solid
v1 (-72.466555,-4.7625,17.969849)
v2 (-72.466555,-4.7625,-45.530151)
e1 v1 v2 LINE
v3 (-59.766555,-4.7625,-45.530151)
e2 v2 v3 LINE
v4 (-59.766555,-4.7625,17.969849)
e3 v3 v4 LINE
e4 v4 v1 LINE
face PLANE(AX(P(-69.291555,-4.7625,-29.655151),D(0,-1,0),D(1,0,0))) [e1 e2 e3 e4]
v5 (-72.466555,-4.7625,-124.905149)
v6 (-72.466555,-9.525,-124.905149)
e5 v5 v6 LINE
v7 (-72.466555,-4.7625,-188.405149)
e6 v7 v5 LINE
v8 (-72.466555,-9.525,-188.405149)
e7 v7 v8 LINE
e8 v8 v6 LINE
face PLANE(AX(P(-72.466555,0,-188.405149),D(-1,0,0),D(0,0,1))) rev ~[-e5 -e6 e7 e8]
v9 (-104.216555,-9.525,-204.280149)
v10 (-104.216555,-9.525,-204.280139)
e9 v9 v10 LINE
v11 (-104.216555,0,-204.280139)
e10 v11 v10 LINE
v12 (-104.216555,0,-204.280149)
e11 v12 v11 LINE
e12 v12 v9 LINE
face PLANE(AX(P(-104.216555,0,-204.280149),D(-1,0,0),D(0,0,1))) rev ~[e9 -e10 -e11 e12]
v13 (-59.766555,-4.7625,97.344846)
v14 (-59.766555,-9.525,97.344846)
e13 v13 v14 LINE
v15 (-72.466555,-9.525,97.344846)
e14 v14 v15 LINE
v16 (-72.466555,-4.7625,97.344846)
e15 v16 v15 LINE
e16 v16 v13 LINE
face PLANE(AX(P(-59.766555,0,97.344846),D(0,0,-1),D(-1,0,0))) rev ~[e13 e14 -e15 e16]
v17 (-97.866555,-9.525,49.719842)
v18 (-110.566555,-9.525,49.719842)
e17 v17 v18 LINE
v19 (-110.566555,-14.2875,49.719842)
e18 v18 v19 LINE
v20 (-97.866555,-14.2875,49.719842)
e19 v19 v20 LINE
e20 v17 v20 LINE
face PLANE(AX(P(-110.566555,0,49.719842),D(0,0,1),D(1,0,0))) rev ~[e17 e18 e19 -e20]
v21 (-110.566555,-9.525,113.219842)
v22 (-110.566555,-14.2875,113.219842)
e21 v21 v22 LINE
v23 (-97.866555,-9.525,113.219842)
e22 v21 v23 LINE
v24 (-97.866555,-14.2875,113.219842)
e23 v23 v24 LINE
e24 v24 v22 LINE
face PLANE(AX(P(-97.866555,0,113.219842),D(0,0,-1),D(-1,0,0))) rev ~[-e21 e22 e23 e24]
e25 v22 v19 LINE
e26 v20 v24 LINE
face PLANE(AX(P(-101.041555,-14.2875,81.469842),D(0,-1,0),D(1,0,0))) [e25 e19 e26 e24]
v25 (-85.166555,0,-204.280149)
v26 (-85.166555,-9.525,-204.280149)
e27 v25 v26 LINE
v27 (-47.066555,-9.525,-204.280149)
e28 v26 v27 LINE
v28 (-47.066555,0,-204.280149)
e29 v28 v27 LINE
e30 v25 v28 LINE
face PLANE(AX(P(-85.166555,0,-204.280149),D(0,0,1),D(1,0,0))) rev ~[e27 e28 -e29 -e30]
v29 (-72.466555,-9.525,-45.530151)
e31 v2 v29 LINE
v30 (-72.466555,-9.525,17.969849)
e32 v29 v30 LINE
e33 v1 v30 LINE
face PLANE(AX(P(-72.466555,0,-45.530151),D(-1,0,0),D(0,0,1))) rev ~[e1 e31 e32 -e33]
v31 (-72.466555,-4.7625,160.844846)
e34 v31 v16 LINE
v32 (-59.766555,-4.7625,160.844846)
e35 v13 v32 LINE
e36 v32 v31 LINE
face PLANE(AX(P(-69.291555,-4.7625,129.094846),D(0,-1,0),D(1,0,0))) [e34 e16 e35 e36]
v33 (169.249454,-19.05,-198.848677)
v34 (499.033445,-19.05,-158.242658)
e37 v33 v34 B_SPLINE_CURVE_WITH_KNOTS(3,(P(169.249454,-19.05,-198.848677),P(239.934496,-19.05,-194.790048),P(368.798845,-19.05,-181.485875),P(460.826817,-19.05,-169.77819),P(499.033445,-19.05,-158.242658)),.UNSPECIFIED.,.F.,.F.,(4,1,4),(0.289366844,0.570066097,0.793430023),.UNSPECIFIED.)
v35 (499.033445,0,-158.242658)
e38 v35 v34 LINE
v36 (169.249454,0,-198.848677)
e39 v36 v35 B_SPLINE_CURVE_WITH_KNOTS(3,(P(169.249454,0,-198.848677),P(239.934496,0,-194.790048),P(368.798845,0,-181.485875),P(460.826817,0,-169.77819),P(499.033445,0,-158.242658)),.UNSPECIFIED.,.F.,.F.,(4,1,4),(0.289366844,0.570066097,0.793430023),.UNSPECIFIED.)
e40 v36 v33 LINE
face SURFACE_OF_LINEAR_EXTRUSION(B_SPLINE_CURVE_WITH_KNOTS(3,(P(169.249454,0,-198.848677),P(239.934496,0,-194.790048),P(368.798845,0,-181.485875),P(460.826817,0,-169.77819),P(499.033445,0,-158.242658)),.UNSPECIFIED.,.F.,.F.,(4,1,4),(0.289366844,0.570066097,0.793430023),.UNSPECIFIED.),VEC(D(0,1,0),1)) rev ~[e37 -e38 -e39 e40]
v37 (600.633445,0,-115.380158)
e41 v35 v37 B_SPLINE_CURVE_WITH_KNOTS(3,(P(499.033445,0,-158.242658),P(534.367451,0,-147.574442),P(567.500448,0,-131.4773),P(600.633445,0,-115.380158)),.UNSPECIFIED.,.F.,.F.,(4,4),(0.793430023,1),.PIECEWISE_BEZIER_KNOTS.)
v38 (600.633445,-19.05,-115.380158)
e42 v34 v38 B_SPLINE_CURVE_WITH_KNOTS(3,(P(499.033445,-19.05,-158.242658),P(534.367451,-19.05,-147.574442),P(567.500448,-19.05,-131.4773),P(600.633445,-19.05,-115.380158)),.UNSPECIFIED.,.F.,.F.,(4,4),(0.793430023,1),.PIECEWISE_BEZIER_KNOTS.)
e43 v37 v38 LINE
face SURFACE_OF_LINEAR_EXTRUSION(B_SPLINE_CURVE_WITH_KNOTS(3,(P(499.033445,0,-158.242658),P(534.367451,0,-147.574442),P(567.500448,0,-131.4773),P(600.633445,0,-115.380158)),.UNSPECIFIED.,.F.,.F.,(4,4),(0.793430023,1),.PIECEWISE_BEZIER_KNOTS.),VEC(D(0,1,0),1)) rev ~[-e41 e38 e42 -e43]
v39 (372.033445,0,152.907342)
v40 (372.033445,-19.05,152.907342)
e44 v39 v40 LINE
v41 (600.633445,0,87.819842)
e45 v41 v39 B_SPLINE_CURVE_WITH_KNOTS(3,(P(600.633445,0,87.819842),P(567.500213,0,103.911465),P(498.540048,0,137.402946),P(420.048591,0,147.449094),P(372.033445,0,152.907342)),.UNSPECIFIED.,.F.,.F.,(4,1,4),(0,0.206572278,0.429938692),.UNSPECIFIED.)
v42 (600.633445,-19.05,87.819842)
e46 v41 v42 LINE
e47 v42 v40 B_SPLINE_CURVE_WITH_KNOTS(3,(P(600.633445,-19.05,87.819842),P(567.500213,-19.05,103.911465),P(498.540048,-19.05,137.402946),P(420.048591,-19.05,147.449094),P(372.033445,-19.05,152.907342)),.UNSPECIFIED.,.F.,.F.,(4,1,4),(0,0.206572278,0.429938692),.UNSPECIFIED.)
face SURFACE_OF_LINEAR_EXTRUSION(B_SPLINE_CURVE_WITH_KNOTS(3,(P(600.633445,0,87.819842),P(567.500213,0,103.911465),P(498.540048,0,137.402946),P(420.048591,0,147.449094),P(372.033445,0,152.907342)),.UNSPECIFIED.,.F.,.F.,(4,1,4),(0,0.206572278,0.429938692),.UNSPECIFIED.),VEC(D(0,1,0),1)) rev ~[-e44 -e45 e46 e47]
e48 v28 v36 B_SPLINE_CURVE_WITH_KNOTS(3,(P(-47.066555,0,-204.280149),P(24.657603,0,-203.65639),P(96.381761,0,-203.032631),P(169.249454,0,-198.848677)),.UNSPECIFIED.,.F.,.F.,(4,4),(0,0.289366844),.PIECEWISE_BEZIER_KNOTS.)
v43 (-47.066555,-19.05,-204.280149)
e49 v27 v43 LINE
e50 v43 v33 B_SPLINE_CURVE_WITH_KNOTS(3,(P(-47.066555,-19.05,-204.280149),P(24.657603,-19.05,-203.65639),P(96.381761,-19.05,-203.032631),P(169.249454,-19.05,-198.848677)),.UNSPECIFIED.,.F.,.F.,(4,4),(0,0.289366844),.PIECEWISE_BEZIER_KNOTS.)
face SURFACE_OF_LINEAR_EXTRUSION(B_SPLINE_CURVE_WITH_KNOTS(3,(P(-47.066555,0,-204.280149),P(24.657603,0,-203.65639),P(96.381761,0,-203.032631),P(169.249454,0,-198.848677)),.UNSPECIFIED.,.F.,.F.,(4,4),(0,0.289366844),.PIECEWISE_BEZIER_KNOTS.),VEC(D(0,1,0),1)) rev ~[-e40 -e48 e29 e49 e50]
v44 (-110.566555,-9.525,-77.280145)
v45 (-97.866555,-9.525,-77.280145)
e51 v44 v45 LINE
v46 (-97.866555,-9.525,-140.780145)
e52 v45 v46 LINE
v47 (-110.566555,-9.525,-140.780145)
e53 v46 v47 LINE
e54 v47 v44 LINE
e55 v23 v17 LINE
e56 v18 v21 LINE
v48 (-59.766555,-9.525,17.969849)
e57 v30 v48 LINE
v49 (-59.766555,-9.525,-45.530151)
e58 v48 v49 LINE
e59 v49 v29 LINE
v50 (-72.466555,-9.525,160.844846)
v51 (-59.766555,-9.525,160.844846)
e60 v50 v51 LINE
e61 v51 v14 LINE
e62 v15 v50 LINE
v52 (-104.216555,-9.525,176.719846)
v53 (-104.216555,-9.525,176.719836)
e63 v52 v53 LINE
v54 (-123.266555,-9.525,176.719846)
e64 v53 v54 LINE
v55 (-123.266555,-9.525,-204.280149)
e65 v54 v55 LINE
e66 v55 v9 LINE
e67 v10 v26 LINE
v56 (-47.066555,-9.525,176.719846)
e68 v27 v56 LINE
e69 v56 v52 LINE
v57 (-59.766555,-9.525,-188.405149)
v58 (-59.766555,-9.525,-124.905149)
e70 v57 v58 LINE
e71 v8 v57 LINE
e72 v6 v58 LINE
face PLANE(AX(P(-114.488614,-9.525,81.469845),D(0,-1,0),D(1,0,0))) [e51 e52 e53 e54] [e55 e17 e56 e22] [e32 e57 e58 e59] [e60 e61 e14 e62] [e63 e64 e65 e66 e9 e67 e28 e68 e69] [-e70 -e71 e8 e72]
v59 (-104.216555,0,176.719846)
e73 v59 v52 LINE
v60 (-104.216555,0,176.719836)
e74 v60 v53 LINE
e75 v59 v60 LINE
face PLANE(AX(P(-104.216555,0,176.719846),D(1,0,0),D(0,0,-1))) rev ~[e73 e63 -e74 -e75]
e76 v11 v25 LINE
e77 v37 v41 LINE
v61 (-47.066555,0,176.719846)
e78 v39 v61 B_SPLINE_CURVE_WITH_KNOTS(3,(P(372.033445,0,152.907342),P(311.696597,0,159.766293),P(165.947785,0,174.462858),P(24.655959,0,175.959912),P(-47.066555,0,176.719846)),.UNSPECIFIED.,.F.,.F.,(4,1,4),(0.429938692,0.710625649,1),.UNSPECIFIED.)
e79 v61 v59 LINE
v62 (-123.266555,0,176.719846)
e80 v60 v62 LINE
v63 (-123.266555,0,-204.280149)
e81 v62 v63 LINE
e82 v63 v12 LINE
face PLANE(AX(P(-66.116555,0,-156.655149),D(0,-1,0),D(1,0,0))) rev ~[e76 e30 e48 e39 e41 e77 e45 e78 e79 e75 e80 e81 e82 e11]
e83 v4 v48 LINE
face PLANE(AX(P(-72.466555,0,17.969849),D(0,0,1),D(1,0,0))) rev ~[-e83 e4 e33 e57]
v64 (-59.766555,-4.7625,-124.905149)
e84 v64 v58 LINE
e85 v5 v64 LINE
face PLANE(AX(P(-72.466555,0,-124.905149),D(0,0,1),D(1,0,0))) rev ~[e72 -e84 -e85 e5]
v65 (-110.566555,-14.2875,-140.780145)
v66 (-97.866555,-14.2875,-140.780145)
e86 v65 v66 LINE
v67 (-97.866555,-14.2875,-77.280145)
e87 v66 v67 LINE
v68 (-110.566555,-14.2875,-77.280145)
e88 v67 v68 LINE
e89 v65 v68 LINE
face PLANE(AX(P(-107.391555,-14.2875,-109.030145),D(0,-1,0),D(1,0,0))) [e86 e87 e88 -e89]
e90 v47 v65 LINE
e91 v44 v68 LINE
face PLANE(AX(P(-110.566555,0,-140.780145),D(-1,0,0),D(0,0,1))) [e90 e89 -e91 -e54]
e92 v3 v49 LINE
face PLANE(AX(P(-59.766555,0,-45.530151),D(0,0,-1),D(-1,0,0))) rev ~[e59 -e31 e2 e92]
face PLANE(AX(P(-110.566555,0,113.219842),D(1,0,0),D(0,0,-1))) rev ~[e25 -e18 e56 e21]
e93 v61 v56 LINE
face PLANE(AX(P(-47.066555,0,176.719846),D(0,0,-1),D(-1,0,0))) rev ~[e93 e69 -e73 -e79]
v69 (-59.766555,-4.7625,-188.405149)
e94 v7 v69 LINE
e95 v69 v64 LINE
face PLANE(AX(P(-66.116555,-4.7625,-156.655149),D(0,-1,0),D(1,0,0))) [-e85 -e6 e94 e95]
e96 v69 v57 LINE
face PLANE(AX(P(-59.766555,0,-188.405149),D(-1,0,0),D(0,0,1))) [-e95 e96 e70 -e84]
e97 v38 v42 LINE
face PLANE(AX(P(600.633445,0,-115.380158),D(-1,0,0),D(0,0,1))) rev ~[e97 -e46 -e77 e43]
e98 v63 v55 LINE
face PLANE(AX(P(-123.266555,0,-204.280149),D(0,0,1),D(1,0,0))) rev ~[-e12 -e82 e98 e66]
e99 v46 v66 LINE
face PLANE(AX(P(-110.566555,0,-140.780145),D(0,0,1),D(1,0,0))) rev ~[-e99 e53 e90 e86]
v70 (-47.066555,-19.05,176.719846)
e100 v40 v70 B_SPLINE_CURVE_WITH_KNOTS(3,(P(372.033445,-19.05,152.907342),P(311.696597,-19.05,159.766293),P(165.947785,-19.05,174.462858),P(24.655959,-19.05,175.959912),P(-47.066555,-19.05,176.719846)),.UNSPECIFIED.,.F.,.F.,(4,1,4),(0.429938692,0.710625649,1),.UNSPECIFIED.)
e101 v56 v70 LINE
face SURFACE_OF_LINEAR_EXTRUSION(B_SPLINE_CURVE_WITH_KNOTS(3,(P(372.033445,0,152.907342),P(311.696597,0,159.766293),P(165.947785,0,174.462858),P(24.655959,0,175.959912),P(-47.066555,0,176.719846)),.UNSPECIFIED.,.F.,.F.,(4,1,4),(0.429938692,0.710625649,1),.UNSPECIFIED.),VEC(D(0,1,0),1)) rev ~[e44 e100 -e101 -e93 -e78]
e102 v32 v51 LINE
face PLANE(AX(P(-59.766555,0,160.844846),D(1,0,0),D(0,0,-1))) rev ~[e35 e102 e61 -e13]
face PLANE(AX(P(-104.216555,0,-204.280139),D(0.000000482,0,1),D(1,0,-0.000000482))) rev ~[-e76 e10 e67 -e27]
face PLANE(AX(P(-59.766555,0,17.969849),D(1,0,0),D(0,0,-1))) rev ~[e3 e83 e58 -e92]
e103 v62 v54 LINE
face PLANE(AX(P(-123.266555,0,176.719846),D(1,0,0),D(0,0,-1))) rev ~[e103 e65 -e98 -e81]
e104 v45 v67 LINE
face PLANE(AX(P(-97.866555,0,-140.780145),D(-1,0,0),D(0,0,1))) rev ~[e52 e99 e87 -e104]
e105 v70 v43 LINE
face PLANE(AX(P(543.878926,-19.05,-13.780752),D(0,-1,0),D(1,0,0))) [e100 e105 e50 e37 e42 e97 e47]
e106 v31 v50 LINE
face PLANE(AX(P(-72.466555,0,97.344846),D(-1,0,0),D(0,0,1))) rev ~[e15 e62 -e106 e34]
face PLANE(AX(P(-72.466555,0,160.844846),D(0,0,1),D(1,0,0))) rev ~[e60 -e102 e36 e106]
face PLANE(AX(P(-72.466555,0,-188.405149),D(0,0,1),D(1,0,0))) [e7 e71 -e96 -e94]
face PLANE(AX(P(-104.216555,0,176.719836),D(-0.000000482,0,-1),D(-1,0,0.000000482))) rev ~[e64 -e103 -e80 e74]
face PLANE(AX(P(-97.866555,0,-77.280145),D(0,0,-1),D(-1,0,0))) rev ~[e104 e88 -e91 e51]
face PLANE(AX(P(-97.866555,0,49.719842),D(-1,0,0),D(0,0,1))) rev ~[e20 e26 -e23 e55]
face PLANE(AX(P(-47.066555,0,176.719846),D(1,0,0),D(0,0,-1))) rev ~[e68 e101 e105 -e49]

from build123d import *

# Parameters (mm, degrees)
F1_DEPTH = 19.05
F0_W     = 12.7
F0_H     = 63.5
F2_DEPTH = 9.525
F0_W_2   = 6.35
F0_H_2   = 31.75
F3_DEPTH = 4.7625
F4_DEPTH = 14.2875


# Not quite as in the source:
# - ends of sketch curves that miss each other by under 0.0002 mm in the source are joined


with BuildPart() as f1:
    # F0 (on Front) → F1 (new body)
    with BuildSketch(Plane.XZ):
        with BuildLine():
            Line((499.03344463, -13.7801575565), (499.03344463, -158.2426575565))
            add(Edge.make_bspline(
                [(499.03344463, -158.2426575565), (534.3674505865, -147.5744416568), (567.5004476082, -131.4772996066), (600.63344463, -115.3801575565)],
                knots=[0.7934300226, 0.7934300226, 0.7934300226, 0.7934300226, 1, 1, 1, 1], degree=3))
            Line((600.63344463, -115.3801575565), (600.63344463, -13.7801575565))
            Line((600.63344463, -13.7801575565), (600.63344463, 87.8198424435))
            add(Edge.make_bspline(
                [(600.63344463, 87.8198424435), (567.5002128258, 103.9114654586), (534.3669810216, 120.0030884738), (499.03344463, 130.6823424435)],
                knots=[0, 0, 0, 0, 0.2065722783, 0.2065722783, 0.2065722783, 0.2065722783], degree=3))
            Line((499.03344463, 130.6823424435), (499.03344463, -13.7801575565))
        make_face()
        with BuildLine():
            Line((169.2494543654, -13.9049269416), (169.2494543653, -198.8486769416))
            add(Edge.make_bspline(
                [(169.2494543653, -198.8486769416), (239.9344955626, -194.7900478461), (311.6955925282, -187.3813112289), (372.03344463, -180.4676575565)],
                knots=[0.2893668435, 0.2893668435, 0.2893668435, 0.2893668435, 0.5700660968, 0.5700660968, 0.5700660968, 0.5700660968], degree=3))
            Line((372.03344463, -180.4676575565), (372.03344463, -13.7801575565))
            Line((372.03344463, -13.7801575565), (372.03344463, 152.9073424435))
            add(Edge.make_bspline(
                [(372.03344463, 152.9073424435), (311.6965969023, 159.7662930053), (239.9327534215, 167.0025918958), (169.2494543654, 171.0388230584)],
                knots=[0.4299386922, 0.4299386922, 0.4299386922, 0.4299386922, 0.7106256488, 0.7106256488, 0.7106256488, 0.7106256488], degree=3))
            Line((169.2494543654, 171.0388230584), (169.2494543654, -13.9049269416))
        make_face()
        with BuildLine():
            Line((372.03344463, -13.7801575565), (372.03344463, -180.4676575565))
            add(Edge.make_bspline(
                [(372.03344463, -180.4676575565), (420.0467519851, -174.9661793441), (460.8268165983, -169.7781895634), (499.03344463, -158.2426575565)],
                knots=[0.5700660968, 0.5700660968, 0.5700660968, 0.5700660968, 0.7934300226, 0.7934300226, 0.7934300226, 0.7934300226], degree=3))
            Line((499.03344463, -158.2426575565), (499.03344463, -13.7801575565))
            Line((499.03344463, -13.7801575565), (499.03344463, 130.6823424435))
            add(Edge.make_bspline(
                [(499.03344463, 130.6823424435), (460.8273243383, 142.2298099053), (420.0485909934, 147.4490938355), (372.03344463, 152.9073424435)],
                knots=[0.2065722783, 0.2065722783, 0.2065722783, 0.2065722783, 0.4299386922, 0.4299386922, 0.4299386922, 0.4299386922], degree=3))
            Line((372.03344463, 152.9073424435), (372.03344463, -13.7801575565))
        make_face()
        with BuildLine():
            Line((-47.06655537, -13.7801514768), (-47.06655537, -204.2801485002))
            add(Edge.make_bspline(
                [(-47.06655537, -204.2801485002), (24.657602579, -203.6563895898), (96.3817605281, -203.0326306794), (169.2494543653, -198.8486769416)],
                knots=[0, 0, 0, 0, 0.2893668435, 0.2893668435, 0.2893668435, 0.2893668435], degree=3))
            Line((169.2494543653, -198.8486769416), (169.2494543654, -13.9049269416))
            Line((169.2494543654, -13.9049269416), (169.2494543654, 171.0388230584))
            add(Edge.make_bspline(
                [(169.2494543654, 171.0388230584), (96.3784736275, 175.1999774928), (24.6559591287, 175.9599115197), (-47.06655537, 176.7198455466)],
                knots=[0.7106256488, 0.7106256488, 0.7106256488, 0.7106256488, 1, 1, 1, 1], degree=3))
            Line((-47.06655537, 176.7198455466), (-47.06655537, -13.7801514768))
        make_face()
    extrude(amount=F1_DEPTH)

    # F0 (on Front) → F2 (join)
    with BuildSketch(Plane.XZ):
        Polygon((-123.26655537, 176.7198455466), (-123.26655537, -13.7801514768), (-104.21655537, -13.7801514768), (-104.21655537, 49.7198424435), (-110.56655537, 49.7198424435), (-110.56655537, 113.2198424435), (-104.21655537, 113.2198424435), (-104.21655537, 176.7198363638), align=None)
        Polygon((-104.21655537, 49.7198424435), (-104.21655537, -13.7801514768), (-85.16655537, -13.7801514768), (-85.16655537, 176.7198455466), (-104.21655537, 176.7198455466), (-104.21655537, 113.2198424435), (-97.86655537, 113.2198424435), (-97.86655537, 49.7198424435), align=None)
        Polygon((-85.16655537, 176.7198455466), (-85.16655537, -13.7801514768), (-72.46655537, -13.7801514768), (-72.46655537, 17.9698485232), (-66.11655537, 17.9698485232), (-66.11655537, 81.4698470349), (-66.11655537, 97.3448462908), (-72.46655537, 97.3448462908), (-72.46655537, 160.8448462908), (-66.11655537, 160.8448462908), (-66.11655537, 176.7198455466), align=None)
        Polygon((-47.06655537, 176.7198455466), (-66.11655537, 176.7198455466), (-66.11655537, 160.8448462908), (-59.76655537, 160.8448462908), (-59.76655537, 97.3448462908), (-66.11655537, 97.3448462908), (-66.11655537, 81.4698470349), (-66.11655537, 17.9698485232), (-59.76655537, 17.9698485232), (-59.76655537, -13.7801514768), (-47.06655537, -13.7801514768), align=None)
        Polygon((-104.21655537, -13.7801514768), (-123.26655537, -13.7801514768), (-123.26655537, -204.2801485003), (-104.21655537, -204.2801485002), (-104.21655537, -140.7801453971), (-110.56655537, -140.7801453971), (-110.56655537, -77.2801453971), (-104.21655537, -77.2801453971), align=None)
        Polygon((-85.16655537, -13.7801514768), (-104.21655537, -13.7801514768), (-104.21655537, -77.2801453971), (-97.86655537, -77.2801453971), (-97.86655537, -140.7801453971), (-104.21655537, -140.7801453971), (-104.21655537, -204.2801393175), (-85.16655537, -204.2801485002), align=None)
        Polygon((-72.46655537, -13.7801514768), (-85.16655537, -13.7801514768), (-85.16655537, -204.2801485002), (-47.06655537, -204.2801485002), (-47.06655537, -13.7801514768), (-59.76655537, -13.7801514768), (-59.76655537, -45.5301514768), (-66.11655537, -45.5301514768), (-72.46655537, -45.5301514768), align=None)
        with Locations((-66.11655537, -156.6551492444)):
            Rectangle(F0_W, F0_H, mode=Mode.SUBTRACT)
    extrude(amount=F2_DEPTH)

    # F0 (on Front) → F3 (join)
    with BuildSketch(Plane.XZ):
        with Locations((-66.11655537, -156.6551492444)):
            Rectangle(F0_W, F0_H)
        with Locations((-69.29155537, -29.6551514768)):
            Rectangle(F0_W_2, F0_H_2)
        with Locations((-62.94155537, -29.6551514768)):
            Rectangle(F0_W_2, F0_H_2)
        with Locations((-69.29155537, 2.0948485232)):
            Rectangle(F0_W_2, F0_H_2)
        with Locations((-62.94155537, 2.0948485232)):
            Rectangle(F0_W_2, F0_H_2)
        Polygon((-66.11655537, 129.0948462908), (-66.11655537, 160.8448462908), (-72.46655537, 160.8448462908), (-72.46655537, 97.3448462908), (-66.11655537, 97.3448462908), align=None)
        Polygon((-59.76655537, 160.8448462908), (-66.11655537, 160.8448462908), (-66.11655537, 129.0948462908), (-66.11655537, 97.3448462908), (-59.76655537, 97.3448462908), align=None)
    extrude(amount=F3_DEPTH)

    # F0 (on Front) → F4 (join)
    with BuildSketch(Plane.XZ):
        Polygon((-104.21655537, 81.4698424435), (-104.21655537, 49.7198424435), (-97.86655537, 49.7198424435), (-97.86655537, 113.2198424435), (-104.21655537, 113.2198424435), align=None)
        Polygon((-110.56655537, 49.7198424435), (-104.21655537, 49.7198424435), (-104.21655537, 81.4698424435), (-104.21655537, 113.2198424435), (-110.56655537, 113.2198424435), align=None)
        with Locations((-107.39155537, -109.0301453971)):
            Rectangle(F0_W_2, F0_H)
        with Locations((-101.04155537, -109.0301453971)):
            Rectangle(F0_W_2, F0_H)
    extrude(amount=F4_DEPTH)


solid = f1.part
